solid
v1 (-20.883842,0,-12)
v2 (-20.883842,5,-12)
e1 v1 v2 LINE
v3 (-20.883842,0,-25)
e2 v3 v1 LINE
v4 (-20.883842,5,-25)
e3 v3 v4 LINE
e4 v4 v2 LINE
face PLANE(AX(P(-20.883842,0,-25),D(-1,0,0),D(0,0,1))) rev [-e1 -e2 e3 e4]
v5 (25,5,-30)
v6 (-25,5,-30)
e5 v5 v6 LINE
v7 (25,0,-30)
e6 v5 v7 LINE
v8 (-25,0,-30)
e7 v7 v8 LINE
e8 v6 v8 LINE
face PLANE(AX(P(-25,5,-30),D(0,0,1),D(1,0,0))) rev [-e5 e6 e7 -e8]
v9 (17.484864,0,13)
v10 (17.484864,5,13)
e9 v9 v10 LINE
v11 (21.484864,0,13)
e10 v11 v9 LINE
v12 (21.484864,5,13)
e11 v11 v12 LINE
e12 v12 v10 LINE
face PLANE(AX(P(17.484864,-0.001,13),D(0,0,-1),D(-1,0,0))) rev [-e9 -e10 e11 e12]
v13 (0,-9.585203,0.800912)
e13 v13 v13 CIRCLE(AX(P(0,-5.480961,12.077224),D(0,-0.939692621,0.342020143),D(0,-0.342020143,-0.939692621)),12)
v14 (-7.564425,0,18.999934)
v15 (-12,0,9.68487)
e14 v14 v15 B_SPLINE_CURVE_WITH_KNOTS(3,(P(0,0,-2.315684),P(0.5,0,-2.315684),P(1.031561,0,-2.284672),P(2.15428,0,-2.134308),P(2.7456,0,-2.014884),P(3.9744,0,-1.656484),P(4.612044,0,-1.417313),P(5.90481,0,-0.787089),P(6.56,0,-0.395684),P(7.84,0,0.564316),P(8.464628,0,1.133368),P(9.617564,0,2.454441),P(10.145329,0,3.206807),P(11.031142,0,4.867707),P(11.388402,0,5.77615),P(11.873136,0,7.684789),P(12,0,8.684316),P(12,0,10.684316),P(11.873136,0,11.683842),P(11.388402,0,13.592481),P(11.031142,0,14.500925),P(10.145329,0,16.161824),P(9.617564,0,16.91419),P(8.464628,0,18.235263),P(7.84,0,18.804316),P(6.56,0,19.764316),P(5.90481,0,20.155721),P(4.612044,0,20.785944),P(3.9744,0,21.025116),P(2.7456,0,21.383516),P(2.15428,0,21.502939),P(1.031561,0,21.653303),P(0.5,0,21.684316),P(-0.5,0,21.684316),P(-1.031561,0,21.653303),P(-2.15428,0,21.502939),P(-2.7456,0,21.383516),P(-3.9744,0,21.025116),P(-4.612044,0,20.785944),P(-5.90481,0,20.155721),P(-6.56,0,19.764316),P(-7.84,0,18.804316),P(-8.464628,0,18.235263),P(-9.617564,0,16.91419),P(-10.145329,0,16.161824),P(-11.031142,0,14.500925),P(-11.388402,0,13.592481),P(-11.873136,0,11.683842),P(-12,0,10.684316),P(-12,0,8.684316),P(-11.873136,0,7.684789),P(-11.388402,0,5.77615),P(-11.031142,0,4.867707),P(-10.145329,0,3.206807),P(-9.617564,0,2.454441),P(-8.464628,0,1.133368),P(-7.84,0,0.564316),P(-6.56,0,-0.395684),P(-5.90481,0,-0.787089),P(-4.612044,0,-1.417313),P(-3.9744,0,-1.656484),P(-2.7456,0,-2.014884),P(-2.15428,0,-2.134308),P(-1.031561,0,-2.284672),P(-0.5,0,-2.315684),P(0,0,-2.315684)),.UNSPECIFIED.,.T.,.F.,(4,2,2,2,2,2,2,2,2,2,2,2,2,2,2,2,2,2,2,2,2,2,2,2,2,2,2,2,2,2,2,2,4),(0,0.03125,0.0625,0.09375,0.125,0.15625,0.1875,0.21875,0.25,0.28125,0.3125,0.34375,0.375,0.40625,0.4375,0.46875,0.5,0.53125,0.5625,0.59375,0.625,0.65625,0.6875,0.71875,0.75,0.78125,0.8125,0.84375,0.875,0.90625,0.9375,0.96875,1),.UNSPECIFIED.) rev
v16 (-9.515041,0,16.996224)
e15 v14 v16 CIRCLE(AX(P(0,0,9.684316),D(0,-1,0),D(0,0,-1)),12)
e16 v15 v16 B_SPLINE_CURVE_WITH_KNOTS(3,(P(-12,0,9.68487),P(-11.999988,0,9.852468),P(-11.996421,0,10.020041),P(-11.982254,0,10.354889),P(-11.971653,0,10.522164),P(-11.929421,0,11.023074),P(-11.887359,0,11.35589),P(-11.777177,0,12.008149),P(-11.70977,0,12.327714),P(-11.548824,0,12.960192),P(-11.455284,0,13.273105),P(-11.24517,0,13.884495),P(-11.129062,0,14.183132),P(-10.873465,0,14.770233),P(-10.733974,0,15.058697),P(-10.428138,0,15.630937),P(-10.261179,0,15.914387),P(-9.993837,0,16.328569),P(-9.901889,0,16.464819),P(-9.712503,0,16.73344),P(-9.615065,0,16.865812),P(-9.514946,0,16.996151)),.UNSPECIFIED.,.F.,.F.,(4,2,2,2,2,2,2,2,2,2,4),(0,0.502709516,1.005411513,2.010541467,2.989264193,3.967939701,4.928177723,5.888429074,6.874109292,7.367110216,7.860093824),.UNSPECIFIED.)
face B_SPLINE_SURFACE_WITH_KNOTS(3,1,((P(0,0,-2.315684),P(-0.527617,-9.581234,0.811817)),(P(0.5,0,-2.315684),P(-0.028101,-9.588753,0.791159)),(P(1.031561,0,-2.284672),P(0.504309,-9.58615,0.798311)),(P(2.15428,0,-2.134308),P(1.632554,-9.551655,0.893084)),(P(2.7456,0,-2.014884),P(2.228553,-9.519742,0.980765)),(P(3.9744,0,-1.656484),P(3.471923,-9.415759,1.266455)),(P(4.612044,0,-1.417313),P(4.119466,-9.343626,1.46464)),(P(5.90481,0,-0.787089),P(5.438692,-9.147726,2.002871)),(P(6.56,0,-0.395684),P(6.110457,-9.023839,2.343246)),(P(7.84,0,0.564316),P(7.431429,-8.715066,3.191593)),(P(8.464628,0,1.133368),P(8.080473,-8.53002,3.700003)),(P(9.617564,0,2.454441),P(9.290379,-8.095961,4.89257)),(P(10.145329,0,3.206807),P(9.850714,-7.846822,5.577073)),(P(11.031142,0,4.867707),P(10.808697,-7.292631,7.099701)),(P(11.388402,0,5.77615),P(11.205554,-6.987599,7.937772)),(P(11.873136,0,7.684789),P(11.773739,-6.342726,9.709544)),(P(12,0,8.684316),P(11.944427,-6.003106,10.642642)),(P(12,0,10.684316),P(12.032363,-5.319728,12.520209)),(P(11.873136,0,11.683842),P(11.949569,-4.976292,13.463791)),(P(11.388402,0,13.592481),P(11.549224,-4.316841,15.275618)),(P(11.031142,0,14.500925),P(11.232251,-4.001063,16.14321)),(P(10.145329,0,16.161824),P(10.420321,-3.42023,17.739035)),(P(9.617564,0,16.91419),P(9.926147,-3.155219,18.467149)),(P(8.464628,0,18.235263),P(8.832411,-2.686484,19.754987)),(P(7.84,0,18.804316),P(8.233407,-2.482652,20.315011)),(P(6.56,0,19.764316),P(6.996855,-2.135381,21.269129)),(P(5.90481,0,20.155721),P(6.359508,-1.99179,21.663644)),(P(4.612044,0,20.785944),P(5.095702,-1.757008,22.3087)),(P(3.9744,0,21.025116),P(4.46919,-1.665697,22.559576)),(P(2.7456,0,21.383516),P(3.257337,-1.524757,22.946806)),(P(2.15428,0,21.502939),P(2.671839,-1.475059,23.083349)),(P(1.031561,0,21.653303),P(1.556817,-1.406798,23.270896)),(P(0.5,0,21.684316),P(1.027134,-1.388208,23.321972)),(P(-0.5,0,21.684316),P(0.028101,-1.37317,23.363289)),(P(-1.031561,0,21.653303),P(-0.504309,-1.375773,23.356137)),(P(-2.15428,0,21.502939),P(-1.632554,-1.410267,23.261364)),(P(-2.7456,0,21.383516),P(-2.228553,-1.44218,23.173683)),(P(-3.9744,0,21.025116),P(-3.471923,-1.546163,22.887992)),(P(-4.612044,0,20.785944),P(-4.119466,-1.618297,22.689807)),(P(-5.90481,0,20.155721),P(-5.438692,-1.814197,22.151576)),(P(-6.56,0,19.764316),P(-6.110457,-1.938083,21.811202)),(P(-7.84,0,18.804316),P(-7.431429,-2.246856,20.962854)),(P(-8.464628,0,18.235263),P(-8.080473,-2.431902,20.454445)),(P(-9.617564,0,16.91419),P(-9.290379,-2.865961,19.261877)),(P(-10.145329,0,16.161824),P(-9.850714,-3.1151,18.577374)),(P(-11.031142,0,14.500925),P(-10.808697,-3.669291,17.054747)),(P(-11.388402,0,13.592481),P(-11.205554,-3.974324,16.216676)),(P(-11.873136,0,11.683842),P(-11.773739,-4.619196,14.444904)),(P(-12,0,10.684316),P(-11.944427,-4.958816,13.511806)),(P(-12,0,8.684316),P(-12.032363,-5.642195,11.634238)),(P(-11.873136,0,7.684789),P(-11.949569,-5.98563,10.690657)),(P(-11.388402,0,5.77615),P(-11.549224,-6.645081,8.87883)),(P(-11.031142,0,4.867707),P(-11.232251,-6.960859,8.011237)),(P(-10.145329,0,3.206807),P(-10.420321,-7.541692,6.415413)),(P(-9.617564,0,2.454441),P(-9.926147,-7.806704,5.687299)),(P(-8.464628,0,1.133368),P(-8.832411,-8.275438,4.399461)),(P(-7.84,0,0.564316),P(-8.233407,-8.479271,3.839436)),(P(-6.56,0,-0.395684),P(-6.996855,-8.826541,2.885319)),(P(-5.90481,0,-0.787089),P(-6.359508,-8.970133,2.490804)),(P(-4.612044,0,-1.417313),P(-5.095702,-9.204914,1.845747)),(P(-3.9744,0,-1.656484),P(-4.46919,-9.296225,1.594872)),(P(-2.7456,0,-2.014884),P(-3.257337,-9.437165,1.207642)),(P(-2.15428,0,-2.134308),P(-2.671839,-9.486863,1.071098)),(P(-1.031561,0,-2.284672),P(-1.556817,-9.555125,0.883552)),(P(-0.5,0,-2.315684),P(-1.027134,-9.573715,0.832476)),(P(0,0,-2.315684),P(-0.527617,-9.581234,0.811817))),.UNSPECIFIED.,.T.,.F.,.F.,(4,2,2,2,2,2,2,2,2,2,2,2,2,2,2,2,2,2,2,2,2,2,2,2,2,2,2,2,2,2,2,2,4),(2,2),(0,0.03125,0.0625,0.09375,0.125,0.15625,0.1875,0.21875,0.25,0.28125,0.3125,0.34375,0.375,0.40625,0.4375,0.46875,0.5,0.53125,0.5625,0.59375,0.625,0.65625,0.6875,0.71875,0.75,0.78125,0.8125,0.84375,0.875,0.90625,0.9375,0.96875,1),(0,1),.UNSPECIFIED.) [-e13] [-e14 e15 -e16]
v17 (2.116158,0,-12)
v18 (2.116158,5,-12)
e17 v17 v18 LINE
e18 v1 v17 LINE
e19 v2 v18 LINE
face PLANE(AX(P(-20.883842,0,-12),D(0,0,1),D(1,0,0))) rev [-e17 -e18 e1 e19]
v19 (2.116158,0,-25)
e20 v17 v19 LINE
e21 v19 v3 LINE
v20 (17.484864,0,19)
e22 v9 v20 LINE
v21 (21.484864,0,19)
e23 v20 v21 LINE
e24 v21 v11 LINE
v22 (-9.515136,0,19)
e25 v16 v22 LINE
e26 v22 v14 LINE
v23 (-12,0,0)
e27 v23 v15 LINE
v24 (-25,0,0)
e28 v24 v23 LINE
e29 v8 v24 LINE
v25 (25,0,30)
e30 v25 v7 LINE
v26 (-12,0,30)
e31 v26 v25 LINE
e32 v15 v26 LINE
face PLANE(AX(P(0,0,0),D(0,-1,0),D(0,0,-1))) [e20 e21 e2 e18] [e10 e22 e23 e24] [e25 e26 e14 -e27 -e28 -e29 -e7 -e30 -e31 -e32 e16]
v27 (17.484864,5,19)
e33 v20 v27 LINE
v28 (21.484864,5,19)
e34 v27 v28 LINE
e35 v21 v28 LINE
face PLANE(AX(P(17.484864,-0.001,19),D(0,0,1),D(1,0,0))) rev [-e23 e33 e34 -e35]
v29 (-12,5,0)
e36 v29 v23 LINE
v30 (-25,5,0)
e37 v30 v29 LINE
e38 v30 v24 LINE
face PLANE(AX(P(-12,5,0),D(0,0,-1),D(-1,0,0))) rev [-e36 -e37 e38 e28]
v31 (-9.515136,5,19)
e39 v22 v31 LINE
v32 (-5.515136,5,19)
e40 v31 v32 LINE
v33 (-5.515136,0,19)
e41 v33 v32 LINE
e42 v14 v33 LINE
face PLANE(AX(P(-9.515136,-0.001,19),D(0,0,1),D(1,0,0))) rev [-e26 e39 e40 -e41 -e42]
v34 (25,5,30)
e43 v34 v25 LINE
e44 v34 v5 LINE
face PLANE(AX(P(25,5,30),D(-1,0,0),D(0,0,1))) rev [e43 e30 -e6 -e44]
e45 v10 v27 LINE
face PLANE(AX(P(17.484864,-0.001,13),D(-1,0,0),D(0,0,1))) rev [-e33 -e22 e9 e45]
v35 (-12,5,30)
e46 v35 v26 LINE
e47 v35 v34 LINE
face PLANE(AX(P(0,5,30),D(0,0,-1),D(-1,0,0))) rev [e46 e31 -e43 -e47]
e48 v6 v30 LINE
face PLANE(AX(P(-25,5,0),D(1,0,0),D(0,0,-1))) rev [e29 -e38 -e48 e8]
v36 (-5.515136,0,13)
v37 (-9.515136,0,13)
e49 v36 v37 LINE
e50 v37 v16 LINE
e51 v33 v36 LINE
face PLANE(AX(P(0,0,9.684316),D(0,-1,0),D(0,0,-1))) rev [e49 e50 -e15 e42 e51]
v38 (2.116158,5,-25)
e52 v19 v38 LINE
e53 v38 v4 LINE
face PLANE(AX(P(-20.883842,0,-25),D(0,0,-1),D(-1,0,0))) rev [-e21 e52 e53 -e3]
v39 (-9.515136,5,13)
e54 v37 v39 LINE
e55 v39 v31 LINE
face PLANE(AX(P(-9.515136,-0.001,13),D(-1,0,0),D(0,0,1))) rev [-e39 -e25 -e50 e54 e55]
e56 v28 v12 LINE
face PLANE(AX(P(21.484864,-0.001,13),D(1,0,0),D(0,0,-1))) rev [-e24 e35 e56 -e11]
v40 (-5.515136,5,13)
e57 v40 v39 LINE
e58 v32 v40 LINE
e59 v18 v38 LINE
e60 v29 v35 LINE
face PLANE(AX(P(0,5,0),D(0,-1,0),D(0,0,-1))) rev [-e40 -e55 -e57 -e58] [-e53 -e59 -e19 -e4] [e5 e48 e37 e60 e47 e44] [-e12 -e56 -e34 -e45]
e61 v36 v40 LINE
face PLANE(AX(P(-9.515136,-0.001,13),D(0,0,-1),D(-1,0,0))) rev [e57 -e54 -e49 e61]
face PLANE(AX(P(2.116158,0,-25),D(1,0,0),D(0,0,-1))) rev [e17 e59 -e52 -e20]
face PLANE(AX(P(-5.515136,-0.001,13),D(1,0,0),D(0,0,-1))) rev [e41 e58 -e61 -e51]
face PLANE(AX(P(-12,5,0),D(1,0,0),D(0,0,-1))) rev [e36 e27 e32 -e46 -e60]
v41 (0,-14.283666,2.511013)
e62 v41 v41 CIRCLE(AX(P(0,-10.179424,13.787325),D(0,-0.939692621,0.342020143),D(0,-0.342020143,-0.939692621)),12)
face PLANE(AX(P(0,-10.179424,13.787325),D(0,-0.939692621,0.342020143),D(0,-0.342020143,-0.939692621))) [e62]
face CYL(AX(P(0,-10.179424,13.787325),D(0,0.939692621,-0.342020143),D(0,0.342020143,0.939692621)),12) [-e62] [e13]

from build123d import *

# Parameters (mm, degrees)
EXTRUDE_1_DEPTH     = 5
SKETCH_3_W          = 23
SKETCH_3_H          = 13
CUT_EXTRUDE_1_DEPTH = 40.37003937
CUT_EXTRUDE_3_REACH = 41.37
SKETCH_4_W          = 4
SKETCH_4_H          = 6
SKETCH_10_R         = 12
EXTRUDE_2_DEPTH     = 5


with BuildPart() as part:
    # 草图1 → 凸台-拉伸1 (new body)
    with BuildSketch(Plane(origin=(0, 0, 0), x_dir=(1, 0, 0), z_dir=(0, 1, 0))):
        Polygon((-12, 0), (-25, 0), (-25, 30), (25, 30), (25, -30), (0, -30), (-12, -30), align=None)
    extrude(amount=EXTRUDE_1_DEPTH)

    # 草图3 → 切除-拉伸1 (cut, through all)
    with BuildSketch(Plane(origin=(0, 5, 0), x_dir=(1, 0, 0), z_dir=(0, 1, 0))):
        with Locations((-9.383841578, 18.5)):
            Rectangle(SKETCH_3_W, SKETCH_3_H)
    extrude(amount=-CUT_EXTRUDE_1_DEPTH, mode=Mode.SUBTRACT)

    # 草图4 → 切除-拉伸3 (cut, up to next)
    with BuildSketch(Plane(origin=(0, 5, 0), x_dir=(1, 0, 0), z_dir=(0, 1, 0)), mode=Mode.PRIVATE) as cut_extrude_3_sk1:
        with Locations((19.484864268, -16)):
            Rectangle(SKETCH_4_W, SKETCH_4_H)
    cut_extrude_3_tool1 = extrude(cut_extrude_3_sk1.sketch, amount=-CUT_EXTRUDE_3_REACH, mode=Mode.PRIVATE) & part.part
    # 草图4 → 切除-拉伸3 (cut, up to next)
    with BuildSketch(Plane(origin=(0, 5, 0), x_dir=(1, 0, 0), z_dir=(0, 1, 0)), mode=Mode.PRIVATE) as cut_extrude_3_sk2:
        with Locations((-7.515135732, -16)):
            Rectangle(SKETCH_4_W, SKETCH_4_H)
    cut_extrude_3_tool2 = extrude(cut_extrude_3_sk2.sketch, amount=-CUT_EXTRUDE_3_REACH, mode=Mode.PRIVATE) & part.part
    add(cut_extrude_3_tool1.solids().sort_by_distance((19.484864, 5, 16))[0], mode=Mode.SUBTRACT)
    add(cut_extrude_3_tool2.solids().sort_by_distance((-7.515136, 5, 16))[0], mode=Mode.SUBTRACT)

    # 放样3: read off the stored shape, not the designer's step
    # 放样3: loft between two sections, ruled curve by curve
    loft_3_from = [
        Edge.make_bspline([(0, 0, -2.31568428), (0.5, 0, -2.31568428), (1.031560811, 0, -2.284671672), (2.154279897, 0, -2.134307508), (2.7456, 0, -2.01488428), (3.9744, 0, -1.65648428), (4.612043934, 0, -1.417312863), (5.904809999, 0, -0.787089406), (6.56, 0, -0.39568428), (7.84, 0, 0.56431572), (8.46462751, 0, 1.133368075), (9.617564271, 0, 2.454441447), (10.14532872, 0, 3.206807069), (11.031141869, 0, 4.867706723), (11.388402367, 0, 5.776150039), (11.873136095, 0, 7.684789092), (12, 0, 8.68431572), (12, 0, 10.68431572), (11.873136095, 0, 11.683842347), (11.388402367, 0, 13.5924814), (11.031141869, 0, 14.500924716), (10.14532872, 0, 16.16182437), (9.617564271, 0, 16.914189993), (8.46462751, 0, 18.235263365), (7.84, 0, 18.80431572), (6.56, 0, 19.76431572), (5.904809999, 0, 20.155720845), (4.612043934, 0, 20.785944302), (3.9744, 0, 21.02511572), (2.7456, 0, 21.38351572), (2.154279897, 0, 21.502938948), (1.031560811, 0, 21.653303111), (0.5, 0, 21.68431572), (-0.5, 0, 21.68431572), (-1.031560811, 0, 21.653303111), (-2.154279897, 0, 21.502938948), (-2.7456, 0, 21.38351572), (-3.9744, 0, 21.02511572), (-4.612043934, 0, 20.785944302), (-5.904809999, 0, 20.155720845), (-6.56, 0, 19.76431572), (-7.84, 0, 18.80431572), (-8.46462751, 0, 18.235263365), (-9.617564271, 0, 16.914189993), (-10.14532872, 0, 16.16182437), (-11.031141869, 0, 14.500924716), (-11.388402367, 0, 13.5924814), (-11.873136095, 0, 11.683842347), (-12, 0, 10.68431572), (-12, 0, 8.68431572), (-11.873136095, 0, 7.684789092), (-11.388402367, 0, 5.776150039), (-11.031141869, 0, 4.867706723), (-10.14532872, 0, 3.206807069), (-9.617564271, 0, 2.454441447), (-8.46462751, 0, 1.133368075), (-7.84, 0, 0.56431572), (-6.56, 0, -0.39568428), (-5.904809999, 0, -0.787089406), (-4.612043934, 0, -1.417312863), (-3.9744, 0, -1.65648428), (-2.7456, 0, -2.01488428), (-2.154279897, 0, -2.134307508), (-1.031560811, 0, -2.284671672), (-0.5, 0, -2.31568428), (0, 0, -2.31568428)], [0, 0, 0, 0, 0.03125, 0.03125, 0.0625, 0.0625, 0.09375, 0.09375, 0.125, 0.125, 0.15625, 0.15625, 0.1875, 0.1875, 0.21875, 0.21875, 0.25, 0.25, 0.28125, 0.28125, 0.3125, 0.3125, 0.34375, 0.34375, 0.375, 0.375, 0.40625, 0.40625, 0.4375, 0.4375, 0.46875, 0.46875, 0.5, 0.5, 0.53125, 0.53125, 0.5625, 0.5625, 0.59375, 0.59375, 0.625, 0.625, 0.65625, 0.65625, 0.6875, 0.6875, 0.71875, 0.71875, 0.75, 0.75, 0.78125, 0.78125, 0.8125, 0.8125, 0.84375, 0.84375, 0.875, 0.875, 0.90625, 0.90625, 0.9375, 0.9375, 0.96875, 0.96875, 1, 1, 1, 1], 3),
    ]
    loft_3_to = [
        Edge.make_bspline([(-0.52761742, -9.581233834, 0.811817288), (-0.028100952, -9.588752826, 0.79115903), (0.504309371, -9.586149748, 0.798310926), (1.632553943, -9.551655339, 0.893083537), (2.228553016, -9.51974195, 0.980764851), (3.471922859, -9.415759146, 1.266455257), (4.119466067, -9.343625689, 1.464640302), (5.438691682, -9.147725615, 2.002871331), (6.110457419, -9.023839373, 2.343245984), (7.431428969, -8.715066178, 3.191593365), (8.080472584, -8.530020165, 3.700003108), (9.290379491, -8.095961256, 4.892570159), (9.850713657, -7.84682242, 5.577073486), (10.808696799, -7.292631477, 7.099700588), (11.205554347, -6.987598513, 7.937771767), (11.773738573, -6.342726221, 9.709543828), (11.944427098, -6.003106357, 10.642641735), (12.032363334, -5.319727582, 12.520209488), (11.94956942, -4.976292164, 13.463790545), (11.549223729, -4.316841038, 15.275617623), (11.232251268, -4.001063121, 16.143210321), (10.420321391, -3.420230493, 17.73903485), (9.926147426, -3.155218632, 18.467148954), (8.83241074, -2.686484038, 19.754986666), (8.233407447, -2.48265175, 20.315011275), (6.996854684, -2.135381321, 21.269128937), (6.359507641, -1.991789608, 21.663643927), (5.095701505, -1.757008348, 22.308700137), (4.469190132, -1.665697135, 22.559575633), (3.257336635, -1.524756986, 22.94680551), (2.671839192, -1.475059075, 23.083349398), (1.556817078, -1.406797807, 23.270895691), (1.027133887, -1.388207525, 23.321972069), (0.028100952, -1.373169543, 23.363288586), (-0.504309371, -1.375772621, 23.35613669), (-1.632553943, -1.41026703, 23.261364079), (-2.228553016, -1.442180418, 23.173682765), (-3.471922859, -1.546163222, 22.887992358), (-4.119466067, -1.61829668, 22.689807314), (-5.438691682, -1.814196753, 22.151576284), (-6.110457419, -1.938082996, 21.811201631), (-7.431428969, -2.24685619, 20.962854251), (-8.080472584, -2.431902204, 20.454444508), (-9.290379491, -2.865961113, 19.261877456), (-9.850713657, -3.115099949, 18.577374129), (-10.808696799, -3.669290892, 17.054747027), (-11.205554347, -3.974323856, 16.216675848), (-11.773738573, -4.619196147, 14.444903788), (-11.944427098, -4.958816011, 13.51180588), (-12.032363334, -5.642194786, 11.634238127), (-11.94956942, -5.985630205, 10.690657071), (-11.549223729, -6.645081331, 8.878829992), (-11.232251268, -6.960859248, 8.011237295), (-10.420321391, -7.541691876, 6.415412766), (-9.926147426, -7.806703737, 5.687298662), (-8.83241074, -8.275438331, 4.399460949), (-8.233407447, -8.479270619, 3.839436341), (-6.996854684, -8.826541048, 2.885318678), (-6.359507641, -8.970132761, 2.490803689), (-5.095701505, -9.204914021, 1.845747479), (-4.469190132, -9.296225234, 1.594871982), (-3.257336635, -9.437165383, 1.207642105), (-2.671839192, -9.486863294, 1.071098218), (-1.556817078, -9.555124562, 0.883551924), (-1.027133887, -9.573714843, 0.832475546), (-0.52761742, -9.581233834, 0.811817288)], [0, 0, 0, 0, 0.03125, 0.03125, 0.0625, 0.0625, 0.09375, 0.09375, 0.125, 0.125, 0.15625, 0.15625, 0.1875, 0.1875, 0.21875, 0.21875, 0.25, 0.25, 0.28125, 0.28125, 0.3125, 0.3125, 0.34375, 0.34375, 0.375, 0.375, 0.40625, 0.40625, 0.4375, 0.4375, 0.46875, 0.46875, 0.5, 0.5, 0.53125, 0.53125, 0.5625, 0.5625, 0.59375, 0.59375, 0.625, 0.625, 0.65625, 0.65625, 0.6875, 0.6875, 0.71875, 0.71875, 0.75, 0.75, 0.78125, 0.78125, 0.8125, 0.8125, 0.84375, 0.84375, 0.875, 0.875, 0.90625, 0.90625, 0.9375, 0.9375, 0.96875, 0.96875, 1, 1, 1, 1], 3),
    ]
    loft_3 = Solid(Shell([*[Face.make_surface_from_curves(loft_3_from[k], loft_3_to[k]) for k in range(1)], Face(Wire(loft_3_from)), Face(Wire(loft_3_to))]))
    add(loft_3)


with BuildPart() as extrude_2_tool:
    # 草图10 → 凸台-拉伸2 (new body)
    with BuildSketch(Plane(origin=(0, -8.721355433, 3.17431378), x_dir=(1, 0, 0), z_dir=(0, -0.9396926207859081, 0.3420201433256695))):
        with Locations(Location((0, 9.474278962, 0), (0, 0, 270))):
            Circle(SKETCH_10_R)
    extrude(amount=EXTRUDE_2_DEPTH)


with BuildPart() as part_1:
    add(part.part)


with BuildPart() as part_2:
    # 凸台-拉伸2: joined with extrude_2_tool
    add(part_1.part.fuse(extrude_2_tool.part, tol=0.00001))


solid = part_2.part
